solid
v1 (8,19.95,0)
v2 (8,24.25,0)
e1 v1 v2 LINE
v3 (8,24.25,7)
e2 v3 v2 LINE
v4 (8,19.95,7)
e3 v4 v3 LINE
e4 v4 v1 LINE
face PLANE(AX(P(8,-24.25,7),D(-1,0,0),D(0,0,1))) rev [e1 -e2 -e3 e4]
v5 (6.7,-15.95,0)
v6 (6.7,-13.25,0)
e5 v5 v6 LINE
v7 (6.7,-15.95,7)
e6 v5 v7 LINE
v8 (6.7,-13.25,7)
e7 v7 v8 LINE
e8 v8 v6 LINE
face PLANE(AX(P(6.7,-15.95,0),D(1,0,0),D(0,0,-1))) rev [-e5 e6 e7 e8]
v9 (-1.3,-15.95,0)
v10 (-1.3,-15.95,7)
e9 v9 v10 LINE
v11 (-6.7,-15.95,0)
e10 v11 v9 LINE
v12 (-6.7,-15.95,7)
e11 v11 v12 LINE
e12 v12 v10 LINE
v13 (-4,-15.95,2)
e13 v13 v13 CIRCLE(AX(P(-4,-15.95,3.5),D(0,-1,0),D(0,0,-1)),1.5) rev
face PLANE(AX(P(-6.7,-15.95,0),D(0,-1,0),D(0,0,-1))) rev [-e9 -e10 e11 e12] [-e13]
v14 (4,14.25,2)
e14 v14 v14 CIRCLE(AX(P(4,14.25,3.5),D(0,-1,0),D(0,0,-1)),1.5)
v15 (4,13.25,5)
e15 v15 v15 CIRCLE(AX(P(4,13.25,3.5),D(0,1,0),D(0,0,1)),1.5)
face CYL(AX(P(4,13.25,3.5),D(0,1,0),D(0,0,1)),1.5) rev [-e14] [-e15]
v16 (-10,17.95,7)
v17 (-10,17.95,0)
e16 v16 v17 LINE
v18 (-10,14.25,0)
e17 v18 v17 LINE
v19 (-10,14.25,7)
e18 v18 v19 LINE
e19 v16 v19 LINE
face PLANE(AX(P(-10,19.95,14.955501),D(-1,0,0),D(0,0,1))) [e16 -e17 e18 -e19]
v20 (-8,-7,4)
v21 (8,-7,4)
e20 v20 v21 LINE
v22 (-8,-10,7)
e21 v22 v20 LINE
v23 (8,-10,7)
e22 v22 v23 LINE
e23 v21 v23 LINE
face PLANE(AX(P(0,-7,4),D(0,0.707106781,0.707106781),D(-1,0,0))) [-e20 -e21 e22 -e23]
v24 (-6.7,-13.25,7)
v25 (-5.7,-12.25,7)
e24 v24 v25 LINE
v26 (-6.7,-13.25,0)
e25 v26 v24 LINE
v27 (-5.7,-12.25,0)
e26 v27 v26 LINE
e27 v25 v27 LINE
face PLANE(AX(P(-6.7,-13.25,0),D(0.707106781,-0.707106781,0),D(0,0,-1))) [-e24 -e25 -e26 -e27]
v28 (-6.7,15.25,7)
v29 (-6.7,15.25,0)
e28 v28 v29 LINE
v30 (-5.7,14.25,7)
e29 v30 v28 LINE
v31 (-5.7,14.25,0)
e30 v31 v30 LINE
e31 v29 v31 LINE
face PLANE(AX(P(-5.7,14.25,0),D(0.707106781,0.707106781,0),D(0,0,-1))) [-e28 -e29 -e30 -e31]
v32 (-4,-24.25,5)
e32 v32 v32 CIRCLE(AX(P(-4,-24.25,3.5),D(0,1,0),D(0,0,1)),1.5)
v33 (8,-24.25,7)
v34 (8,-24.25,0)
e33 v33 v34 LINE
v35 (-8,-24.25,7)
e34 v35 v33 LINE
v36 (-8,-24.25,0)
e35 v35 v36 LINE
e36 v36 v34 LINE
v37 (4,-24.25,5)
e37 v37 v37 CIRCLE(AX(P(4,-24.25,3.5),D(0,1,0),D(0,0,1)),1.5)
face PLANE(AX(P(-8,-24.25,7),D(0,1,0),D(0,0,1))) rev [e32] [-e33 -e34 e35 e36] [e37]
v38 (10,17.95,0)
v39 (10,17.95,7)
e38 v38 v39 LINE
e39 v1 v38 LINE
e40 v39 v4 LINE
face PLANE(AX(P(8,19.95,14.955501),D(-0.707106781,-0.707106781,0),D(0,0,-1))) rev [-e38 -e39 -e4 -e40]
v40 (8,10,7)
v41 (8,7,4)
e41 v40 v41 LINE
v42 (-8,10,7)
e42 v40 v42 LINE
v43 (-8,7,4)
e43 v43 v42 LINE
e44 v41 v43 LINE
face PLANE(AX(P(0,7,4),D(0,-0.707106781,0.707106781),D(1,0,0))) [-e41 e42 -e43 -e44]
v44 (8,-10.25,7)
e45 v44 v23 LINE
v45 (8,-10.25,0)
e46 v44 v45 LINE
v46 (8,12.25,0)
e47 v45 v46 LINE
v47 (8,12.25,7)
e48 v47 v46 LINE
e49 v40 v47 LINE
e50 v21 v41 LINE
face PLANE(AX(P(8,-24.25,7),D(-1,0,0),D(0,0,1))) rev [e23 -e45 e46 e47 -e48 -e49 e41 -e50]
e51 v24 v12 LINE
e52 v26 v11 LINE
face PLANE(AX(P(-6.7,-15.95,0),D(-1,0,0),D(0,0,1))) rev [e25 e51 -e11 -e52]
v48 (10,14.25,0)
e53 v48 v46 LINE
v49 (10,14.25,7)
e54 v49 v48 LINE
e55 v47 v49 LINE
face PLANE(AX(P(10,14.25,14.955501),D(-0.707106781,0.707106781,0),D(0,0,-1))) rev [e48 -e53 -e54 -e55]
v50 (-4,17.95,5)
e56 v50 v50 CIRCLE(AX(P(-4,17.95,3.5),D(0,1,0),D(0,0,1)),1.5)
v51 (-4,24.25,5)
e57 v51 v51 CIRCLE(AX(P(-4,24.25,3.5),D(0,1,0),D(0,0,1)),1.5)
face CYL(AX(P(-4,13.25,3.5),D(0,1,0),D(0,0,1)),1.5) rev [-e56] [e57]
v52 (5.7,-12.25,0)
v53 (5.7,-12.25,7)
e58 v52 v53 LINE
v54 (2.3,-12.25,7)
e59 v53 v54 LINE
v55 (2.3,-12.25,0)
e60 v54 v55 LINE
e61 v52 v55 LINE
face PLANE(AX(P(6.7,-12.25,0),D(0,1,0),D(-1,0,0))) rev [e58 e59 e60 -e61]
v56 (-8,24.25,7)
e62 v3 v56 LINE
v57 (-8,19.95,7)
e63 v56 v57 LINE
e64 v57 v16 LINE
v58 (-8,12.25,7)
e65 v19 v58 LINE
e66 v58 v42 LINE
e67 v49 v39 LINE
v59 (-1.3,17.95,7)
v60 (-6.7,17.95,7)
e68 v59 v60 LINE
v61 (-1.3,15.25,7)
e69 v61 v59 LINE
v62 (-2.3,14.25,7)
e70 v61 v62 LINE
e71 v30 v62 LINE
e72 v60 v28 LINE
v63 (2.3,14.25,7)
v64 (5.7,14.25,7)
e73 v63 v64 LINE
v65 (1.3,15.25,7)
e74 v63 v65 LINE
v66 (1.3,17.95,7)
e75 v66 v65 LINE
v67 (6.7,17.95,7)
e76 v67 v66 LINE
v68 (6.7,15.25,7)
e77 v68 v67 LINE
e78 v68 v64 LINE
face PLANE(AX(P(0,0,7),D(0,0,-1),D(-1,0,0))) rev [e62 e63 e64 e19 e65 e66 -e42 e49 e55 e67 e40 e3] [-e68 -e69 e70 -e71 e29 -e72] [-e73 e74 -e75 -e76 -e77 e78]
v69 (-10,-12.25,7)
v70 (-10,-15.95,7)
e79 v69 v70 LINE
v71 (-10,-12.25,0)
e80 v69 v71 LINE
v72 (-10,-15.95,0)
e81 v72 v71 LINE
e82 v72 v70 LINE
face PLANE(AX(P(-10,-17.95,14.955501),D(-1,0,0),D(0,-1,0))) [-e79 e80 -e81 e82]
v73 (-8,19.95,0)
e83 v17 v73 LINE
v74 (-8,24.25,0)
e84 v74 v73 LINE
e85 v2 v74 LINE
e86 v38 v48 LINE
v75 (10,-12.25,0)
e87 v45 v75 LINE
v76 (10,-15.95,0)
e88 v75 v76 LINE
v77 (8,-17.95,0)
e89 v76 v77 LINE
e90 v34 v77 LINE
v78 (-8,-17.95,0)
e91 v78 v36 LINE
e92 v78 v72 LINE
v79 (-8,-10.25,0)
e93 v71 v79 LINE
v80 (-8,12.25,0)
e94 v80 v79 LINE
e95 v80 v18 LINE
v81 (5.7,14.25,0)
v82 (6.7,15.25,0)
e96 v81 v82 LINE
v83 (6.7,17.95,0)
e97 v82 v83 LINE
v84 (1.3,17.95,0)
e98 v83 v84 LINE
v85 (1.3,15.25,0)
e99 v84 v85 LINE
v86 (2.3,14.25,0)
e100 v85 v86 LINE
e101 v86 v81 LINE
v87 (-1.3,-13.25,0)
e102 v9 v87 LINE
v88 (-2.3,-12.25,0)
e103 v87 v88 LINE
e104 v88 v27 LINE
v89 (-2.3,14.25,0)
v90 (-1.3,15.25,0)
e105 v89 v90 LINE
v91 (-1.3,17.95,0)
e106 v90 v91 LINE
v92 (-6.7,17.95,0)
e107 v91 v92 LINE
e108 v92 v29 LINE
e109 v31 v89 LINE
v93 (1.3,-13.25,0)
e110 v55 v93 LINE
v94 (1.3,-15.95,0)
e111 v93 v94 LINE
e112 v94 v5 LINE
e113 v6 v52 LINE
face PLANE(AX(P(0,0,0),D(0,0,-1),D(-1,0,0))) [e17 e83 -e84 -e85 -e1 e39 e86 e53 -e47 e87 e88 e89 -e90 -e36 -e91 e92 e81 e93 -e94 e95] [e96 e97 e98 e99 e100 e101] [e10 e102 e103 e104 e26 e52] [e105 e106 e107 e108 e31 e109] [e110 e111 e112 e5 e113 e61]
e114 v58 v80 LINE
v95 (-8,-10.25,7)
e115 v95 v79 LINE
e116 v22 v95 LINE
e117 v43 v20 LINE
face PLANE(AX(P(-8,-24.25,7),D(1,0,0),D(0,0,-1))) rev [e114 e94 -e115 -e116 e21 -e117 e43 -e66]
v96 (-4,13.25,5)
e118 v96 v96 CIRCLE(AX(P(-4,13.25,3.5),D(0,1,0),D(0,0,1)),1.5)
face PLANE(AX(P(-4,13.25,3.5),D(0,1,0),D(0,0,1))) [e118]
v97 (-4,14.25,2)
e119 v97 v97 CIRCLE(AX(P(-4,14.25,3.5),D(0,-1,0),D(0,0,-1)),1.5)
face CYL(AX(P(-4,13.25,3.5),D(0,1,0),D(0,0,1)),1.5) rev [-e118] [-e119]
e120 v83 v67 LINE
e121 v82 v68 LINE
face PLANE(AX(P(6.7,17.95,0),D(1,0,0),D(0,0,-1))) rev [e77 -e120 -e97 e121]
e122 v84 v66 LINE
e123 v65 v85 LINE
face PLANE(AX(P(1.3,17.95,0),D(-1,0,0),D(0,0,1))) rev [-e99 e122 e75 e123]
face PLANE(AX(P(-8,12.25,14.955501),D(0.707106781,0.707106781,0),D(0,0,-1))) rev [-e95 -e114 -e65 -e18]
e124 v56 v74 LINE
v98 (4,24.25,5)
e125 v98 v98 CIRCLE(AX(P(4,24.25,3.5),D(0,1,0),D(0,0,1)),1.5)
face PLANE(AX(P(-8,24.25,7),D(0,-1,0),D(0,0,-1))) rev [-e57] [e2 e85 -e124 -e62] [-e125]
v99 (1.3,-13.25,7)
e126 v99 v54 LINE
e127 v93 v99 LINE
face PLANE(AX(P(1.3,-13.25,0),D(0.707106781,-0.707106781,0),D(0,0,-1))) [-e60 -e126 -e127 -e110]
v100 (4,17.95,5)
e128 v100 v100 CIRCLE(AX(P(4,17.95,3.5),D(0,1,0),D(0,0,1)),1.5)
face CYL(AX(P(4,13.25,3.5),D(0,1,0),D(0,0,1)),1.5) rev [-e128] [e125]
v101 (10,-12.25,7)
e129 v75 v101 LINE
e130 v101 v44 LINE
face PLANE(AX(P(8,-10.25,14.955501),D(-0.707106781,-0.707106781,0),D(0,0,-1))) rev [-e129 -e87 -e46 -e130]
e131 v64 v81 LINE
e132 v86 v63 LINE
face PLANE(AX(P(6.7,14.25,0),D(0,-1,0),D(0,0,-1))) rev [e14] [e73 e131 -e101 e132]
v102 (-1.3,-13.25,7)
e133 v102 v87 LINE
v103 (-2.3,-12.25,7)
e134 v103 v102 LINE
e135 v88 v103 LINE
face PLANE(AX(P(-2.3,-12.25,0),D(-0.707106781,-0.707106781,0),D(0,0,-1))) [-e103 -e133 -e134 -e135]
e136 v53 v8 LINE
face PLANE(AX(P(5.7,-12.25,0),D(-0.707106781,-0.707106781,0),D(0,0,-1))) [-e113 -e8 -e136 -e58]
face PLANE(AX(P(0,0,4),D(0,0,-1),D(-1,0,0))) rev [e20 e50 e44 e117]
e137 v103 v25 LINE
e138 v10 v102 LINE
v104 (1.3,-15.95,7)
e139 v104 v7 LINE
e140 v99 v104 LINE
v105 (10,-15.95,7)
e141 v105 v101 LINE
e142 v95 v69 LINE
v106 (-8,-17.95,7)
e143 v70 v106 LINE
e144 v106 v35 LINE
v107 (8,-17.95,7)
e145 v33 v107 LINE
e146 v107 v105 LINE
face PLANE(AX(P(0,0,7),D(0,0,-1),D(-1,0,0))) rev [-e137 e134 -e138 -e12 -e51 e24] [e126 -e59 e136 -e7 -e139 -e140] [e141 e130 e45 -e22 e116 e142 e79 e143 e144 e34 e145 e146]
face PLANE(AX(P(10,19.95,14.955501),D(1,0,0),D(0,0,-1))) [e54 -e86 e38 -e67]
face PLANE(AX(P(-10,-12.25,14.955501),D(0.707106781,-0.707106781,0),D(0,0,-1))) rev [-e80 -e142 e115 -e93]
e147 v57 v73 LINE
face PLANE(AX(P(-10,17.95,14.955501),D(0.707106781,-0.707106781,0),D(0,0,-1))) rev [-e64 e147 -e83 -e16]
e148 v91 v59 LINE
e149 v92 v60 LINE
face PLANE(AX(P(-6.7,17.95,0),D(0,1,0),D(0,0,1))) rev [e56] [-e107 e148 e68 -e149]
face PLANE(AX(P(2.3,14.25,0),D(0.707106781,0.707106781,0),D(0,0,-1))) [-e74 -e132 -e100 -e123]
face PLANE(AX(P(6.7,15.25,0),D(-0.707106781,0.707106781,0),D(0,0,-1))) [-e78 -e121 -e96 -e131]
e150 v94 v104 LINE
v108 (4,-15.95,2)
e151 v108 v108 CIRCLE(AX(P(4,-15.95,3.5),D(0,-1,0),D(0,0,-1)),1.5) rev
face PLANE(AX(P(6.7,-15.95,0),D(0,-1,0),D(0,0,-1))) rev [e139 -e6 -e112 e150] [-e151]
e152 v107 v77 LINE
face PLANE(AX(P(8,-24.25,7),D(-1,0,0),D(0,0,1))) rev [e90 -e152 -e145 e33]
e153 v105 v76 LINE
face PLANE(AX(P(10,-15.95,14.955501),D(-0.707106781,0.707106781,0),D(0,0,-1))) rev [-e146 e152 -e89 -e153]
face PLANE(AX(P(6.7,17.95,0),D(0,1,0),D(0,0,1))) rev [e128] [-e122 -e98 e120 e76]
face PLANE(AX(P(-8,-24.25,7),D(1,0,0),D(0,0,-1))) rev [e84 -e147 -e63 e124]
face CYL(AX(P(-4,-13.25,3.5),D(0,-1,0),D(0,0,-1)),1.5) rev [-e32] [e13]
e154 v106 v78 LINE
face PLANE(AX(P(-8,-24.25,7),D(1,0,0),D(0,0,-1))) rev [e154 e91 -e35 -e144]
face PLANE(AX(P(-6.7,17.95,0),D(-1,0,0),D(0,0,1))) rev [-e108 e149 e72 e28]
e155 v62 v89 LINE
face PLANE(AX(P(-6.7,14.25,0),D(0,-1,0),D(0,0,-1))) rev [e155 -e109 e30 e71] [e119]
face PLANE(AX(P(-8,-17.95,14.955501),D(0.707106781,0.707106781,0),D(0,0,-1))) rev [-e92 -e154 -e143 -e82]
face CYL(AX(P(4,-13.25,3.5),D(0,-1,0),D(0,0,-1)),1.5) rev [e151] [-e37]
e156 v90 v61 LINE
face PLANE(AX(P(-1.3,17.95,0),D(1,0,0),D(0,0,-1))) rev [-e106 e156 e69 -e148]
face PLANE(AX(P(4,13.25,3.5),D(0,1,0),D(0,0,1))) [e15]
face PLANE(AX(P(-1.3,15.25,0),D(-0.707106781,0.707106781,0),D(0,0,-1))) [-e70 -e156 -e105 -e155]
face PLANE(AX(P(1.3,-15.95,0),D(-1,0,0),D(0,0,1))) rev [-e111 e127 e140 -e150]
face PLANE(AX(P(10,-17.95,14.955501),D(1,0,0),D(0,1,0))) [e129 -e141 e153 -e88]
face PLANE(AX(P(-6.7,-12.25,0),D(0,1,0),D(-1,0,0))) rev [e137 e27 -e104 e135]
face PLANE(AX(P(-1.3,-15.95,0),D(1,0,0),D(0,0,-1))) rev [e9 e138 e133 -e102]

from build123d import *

# Parameters (mm, degrees)
SKETCH1_W           = 16
SKETCH1_H           = 48.5
BOSS_EXTRUDE1_DEPTH = 7
SKETCH2_W           = 5.4
SKETCH2_H           = 3.7
CUT_EXTRUDE1_DEPTH  = 27.47758486
SKETCH3_OUTSIDE_W   = 28.31
SKETCH3_OUTSIDE_H   = 19.31
SKETCH3_OUTSIDE_W_2 = 16
SKETCH3_OUTSIDE_H_2 = 7
SKETCH3_OUTSIDE_R   = 1.5
CUT_EXTRUDE2_DEPTH  = 11
SKETCH4_W           = 16
SKETCH4_H           = 20
CUT_EXTRUDE3_DEPTH  = 3
CHAMFER1_SIZE       = 3
SKETCH5_W           = 2
SKETCH5_H           = 7.7
BOSS_EXTRUDE2_DEPTH = 7
CHAMFER2_SIZE       = 2
CHAMFER3_SIZE       = 1


with BuildPart() as part:
    # Sketch1 → Boss-Extrude1 (new body)
    with BuildSketch(Plane.XY):
        Rectangle(SKETCH1_W, SKETCH1_H)
    extrude(amount=BOSS_EXTRUDE1_DEPTH)

    # Sketch2 → Cut-Extrude1 (cut, through all)
    with BuildSketch(Plane.XY.offset(7)):
        with Locations((-4, 16.1)):
            Rectangle(SKETCH2_W, SKETCH2_H)
        with Locations((4, 16.1)):
            Rectangle(SKETCH2_W, SKETCH2_H)
        with Locations((4, -14.1)):
            Rectangle(SKETCH2_W, SKETCH2_H)
        with Locations((-4, -14.1)):
            Rectangle(SKETCH2_W, SKETCH2_H)
    extrude(amount=-CUT_EXTRUDE1_DEPTH, mode=Mode.SUBTRACT)

    # Sketch3 outside → Cut-Extrude2 (cut)
    # profile 1 of 3: a face of its own
    with BuildSketch(Plane(origin=(0, 24.25, 0), x_dir=(1, 0, 0), z_dir=(0, 1, 0))):
        with Locations((0, -3.5)):
            Rectangle(SKETCH3_OUTSIDE_W, SKETCH3_OUTSIDE_H)
        with Locations((0, -3.5)):
            Rectangle(SKETCH3_OUTSIDE_W_2, SKETCH3_OUTSIDE_H_2, mode=Mode.SUBTRACT)
    # profile 2 of 3: a face of its own
    with BuildSketch(Plane(origin=(0, 24.25, 0), x_dir=(1, 0, 0), z_dir=(0, 1, 0))):
        with Locations(Location((4, -3.5, 0), (0, 0, 270))):
            Circle(SKETCH3_OUTSIDE_R)
    # profile 3 of 3: a face of its own
    with BuildSketch(Plane(origin=(0, 24.25, 0), x_dir=(1, 0, 0), z_dir=(0, 1, 0))):
        with Locations(Location((-4, -3.5, 0), (0, 0, 270))):
            Circle(SKETCH3_OUTSIDE_R)
    cut_extrude2 = extrude(amount=-CUT_EXTRUDE2_DEPTH, mode=Mode.SUBTRACT)

    # Mirror1: Cut-Extrude2 across plane
    add(cut_extrude2.mirror(Plane.ZX), mode=Mode.SUBTRACT)

    # Sketch4 → Cut-Extrude3 (cut)
    with BuildSketch(Plane.XY.offset(7)):
        Rectangle(SKETCH4_W, SKETCH4_H)
    extrude(amount=-CUT_EXTRUDE3_DEPTH, mode=Mode.SUBTRACT)

    # Chamfer1
    chamfer1_edges = [part.edges().sort_by_distance(p)[0] for p in [
        (0, -10, 4),
        (0, 10, 4),
    ]]
    chamfer(chamfer1_edges, length=CHAMFER1_SIZE - 0.0001)  # a hair under: the kernel refuses the full size

    # Sketch5 → Boss-Extrude2 (add)
    with BuildSketch(Plane(origin=(0, 0, 0), x_dir=(-1, 0, 0), z_dir=(0, 0, -1))):
        with Locations((9, 16.1)):
            Rectangle(SKETCH5_W, SKETCH5_H)
        with Locations((-9, 16.1)):
            Rectangle(SKETCH5_W, SKETCH5_H)
        with Locations((-9, -14.1)):
            Rectangle(SKETCH5_W, SKETCH5_H)
        with Locations((9, -14.1)):
            Rectangle(SKETCH5_W, SKETCH5_H)
    extrude(amount=-BOSS_EXTRUDE2_DEPTH)

    # Chamfer2
    chamfer2_edges = [part.edges().sort_by_distance(p)[0] for p in [
        (-10, -17.95, 3.5),
        (-10, -10.25, 3.5),
        (10, -17.95, 3.5),
        (10, -10.25, 3.5),
        (10, 12.25, 3.5),
        (10, 19.95, 3.5),
        (-10, 12.25, 3.5),
        (-10, 19.95, 3.5),
    ]]
    chamfer(chamfer2_edges, length=CHAMFER2_SIZE - 0.0001)  # a hair under: the kernel refuses the full size

    # Chamfer3
    chamfer3_edges = [part.edges().sort_by_distance(p)[0] for p in [
        (-6.7, -12.25, 3.5),
        (-1.3, -12.25, 3.5),
        (6.7, -12.25, 3.5),
        (1.3, -12.25, 3.5),
        (6.7, 14.25, 3.5),
        (1.3, 14.25, 3.5),
        (-1.3, 14.25, 3.5),
        (-6.7, 14.25, 3.5),
    ]]
    chamfer(chamfer3_edges, length=CHAMFER3_SIZE)


solid = part.part
